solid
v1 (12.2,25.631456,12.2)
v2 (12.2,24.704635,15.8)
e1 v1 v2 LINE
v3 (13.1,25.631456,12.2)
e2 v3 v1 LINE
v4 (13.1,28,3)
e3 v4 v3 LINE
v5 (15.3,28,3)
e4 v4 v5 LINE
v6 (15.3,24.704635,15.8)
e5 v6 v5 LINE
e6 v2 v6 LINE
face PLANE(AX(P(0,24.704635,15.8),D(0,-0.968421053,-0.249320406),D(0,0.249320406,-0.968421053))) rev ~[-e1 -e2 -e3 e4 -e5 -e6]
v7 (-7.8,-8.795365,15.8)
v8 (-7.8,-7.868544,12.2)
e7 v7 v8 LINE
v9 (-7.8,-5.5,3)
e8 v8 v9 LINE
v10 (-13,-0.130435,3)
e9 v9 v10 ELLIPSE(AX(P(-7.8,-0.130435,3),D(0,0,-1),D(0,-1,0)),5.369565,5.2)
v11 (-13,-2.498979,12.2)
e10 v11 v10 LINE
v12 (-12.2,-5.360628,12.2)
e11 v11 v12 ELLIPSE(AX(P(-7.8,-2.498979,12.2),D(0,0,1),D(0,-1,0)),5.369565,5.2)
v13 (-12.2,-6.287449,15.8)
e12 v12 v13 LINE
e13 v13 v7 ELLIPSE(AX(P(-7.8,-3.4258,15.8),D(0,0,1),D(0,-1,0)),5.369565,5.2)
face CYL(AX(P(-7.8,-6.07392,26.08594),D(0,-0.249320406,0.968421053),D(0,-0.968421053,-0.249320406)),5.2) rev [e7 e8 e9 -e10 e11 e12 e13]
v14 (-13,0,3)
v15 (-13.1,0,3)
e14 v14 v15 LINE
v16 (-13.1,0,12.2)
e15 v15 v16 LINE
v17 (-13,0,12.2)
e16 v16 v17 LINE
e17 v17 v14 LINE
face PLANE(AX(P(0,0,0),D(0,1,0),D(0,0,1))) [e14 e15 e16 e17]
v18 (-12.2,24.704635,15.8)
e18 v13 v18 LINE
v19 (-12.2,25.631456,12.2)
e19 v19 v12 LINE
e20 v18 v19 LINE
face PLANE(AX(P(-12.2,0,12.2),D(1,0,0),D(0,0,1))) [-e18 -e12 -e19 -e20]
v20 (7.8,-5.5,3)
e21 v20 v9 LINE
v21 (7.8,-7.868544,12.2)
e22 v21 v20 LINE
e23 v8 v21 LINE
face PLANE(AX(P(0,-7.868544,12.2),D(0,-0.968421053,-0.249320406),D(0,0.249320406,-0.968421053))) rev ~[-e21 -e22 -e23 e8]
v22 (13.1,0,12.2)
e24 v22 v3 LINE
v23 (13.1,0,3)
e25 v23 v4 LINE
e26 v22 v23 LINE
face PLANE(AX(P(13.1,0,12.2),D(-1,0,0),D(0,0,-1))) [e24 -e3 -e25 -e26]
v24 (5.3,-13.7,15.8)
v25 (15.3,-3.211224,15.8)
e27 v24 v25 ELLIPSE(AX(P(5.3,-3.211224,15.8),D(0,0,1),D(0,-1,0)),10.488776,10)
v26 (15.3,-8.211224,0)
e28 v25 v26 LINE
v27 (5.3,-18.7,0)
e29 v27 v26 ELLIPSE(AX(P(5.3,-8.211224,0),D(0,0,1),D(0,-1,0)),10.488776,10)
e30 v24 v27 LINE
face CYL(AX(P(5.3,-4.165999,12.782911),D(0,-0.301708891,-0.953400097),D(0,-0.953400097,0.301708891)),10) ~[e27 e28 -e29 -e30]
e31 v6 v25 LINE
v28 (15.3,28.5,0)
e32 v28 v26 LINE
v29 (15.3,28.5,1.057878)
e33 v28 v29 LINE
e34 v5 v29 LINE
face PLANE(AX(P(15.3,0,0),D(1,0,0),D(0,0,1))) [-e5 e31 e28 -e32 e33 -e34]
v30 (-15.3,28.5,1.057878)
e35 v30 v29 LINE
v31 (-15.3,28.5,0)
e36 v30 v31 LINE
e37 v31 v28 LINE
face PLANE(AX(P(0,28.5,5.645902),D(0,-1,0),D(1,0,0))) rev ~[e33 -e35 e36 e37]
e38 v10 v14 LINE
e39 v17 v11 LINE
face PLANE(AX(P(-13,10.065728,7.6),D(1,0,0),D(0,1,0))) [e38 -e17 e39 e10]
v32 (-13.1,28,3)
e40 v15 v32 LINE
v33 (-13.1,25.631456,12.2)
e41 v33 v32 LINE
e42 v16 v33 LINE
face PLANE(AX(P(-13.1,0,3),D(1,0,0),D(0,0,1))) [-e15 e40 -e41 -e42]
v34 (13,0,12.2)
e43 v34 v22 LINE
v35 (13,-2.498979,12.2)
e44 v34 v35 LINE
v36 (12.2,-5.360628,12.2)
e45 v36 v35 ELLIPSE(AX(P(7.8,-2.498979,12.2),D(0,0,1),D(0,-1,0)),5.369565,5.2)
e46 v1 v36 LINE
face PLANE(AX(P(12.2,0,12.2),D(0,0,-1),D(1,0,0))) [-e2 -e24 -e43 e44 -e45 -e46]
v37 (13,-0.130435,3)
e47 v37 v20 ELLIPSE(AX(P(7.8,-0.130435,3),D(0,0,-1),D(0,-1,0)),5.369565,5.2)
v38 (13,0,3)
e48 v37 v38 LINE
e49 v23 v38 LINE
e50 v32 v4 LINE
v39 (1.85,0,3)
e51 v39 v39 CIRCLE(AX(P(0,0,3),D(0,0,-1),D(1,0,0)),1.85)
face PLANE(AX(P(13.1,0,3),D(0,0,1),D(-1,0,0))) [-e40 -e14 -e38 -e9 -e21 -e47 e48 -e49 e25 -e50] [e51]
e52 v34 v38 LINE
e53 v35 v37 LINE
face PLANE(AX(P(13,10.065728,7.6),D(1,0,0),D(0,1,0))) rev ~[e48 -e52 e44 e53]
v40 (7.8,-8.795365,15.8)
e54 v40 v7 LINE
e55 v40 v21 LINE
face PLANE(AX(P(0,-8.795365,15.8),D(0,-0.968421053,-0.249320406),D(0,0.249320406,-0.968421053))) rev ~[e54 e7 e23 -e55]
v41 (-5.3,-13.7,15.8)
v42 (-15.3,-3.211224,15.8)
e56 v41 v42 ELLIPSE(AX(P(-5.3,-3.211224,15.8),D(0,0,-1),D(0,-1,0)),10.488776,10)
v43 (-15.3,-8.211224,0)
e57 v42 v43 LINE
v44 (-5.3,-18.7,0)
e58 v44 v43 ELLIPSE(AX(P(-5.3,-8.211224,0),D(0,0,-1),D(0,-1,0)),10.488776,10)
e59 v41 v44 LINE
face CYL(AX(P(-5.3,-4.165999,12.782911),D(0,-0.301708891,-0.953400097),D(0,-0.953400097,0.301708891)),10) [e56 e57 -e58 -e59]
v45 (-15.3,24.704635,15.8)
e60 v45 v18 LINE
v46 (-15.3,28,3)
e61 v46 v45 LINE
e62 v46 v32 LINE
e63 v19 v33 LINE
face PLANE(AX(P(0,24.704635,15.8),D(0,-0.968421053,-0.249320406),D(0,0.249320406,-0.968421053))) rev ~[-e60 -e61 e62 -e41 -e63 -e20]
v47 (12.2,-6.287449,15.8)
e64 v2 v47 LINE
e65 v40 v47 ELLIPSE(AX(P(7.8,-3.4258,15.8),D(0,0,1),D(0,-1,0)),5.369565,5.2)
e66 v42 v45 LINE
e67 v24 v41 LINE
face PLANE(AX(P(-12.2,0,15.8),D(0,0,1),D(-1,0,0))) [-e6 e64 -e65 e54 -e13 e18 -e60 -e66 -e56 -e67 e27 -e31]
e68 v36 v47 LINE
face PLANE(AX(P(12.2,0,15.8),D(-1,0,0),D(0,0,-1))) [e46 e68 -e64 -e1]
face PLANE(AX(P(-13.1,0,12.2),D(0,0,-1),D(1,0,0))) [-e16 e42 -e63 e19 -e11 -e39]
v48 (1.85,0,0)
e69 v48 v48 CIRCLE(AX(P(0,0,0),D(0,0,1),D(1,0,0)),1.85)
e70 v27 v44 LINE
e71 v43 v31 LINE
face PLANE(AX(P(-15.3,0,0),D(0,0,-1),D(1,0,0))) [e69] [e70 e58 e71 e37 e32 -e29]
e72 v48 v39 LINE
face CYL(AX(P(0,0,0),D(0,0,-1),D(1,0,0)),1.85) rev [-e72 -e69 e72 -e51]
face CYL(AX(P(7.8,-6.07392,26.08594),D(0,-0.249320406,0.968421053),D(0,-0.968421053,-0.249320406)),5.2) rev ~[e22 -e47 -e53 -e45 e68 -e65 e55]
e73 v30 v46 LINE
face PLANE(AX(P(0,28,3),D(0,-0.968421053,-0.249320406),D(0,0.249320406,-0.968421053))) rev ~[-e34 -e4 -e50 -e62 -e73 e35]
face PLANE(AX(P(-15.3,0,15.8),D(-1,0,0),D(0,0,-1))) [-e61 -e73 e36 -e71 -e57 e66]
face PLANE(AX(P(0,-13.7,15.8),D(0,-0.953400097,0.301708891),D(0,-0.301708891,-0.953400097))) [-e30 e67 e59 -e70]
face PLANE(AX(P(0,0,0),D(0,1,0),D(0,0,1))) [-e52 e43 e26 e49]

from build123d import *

# Parameters (mm, degrees)
F3_DEPTH    = 13
F4_DEPTH    = 12.2
F5_T1_DEPTH = 35.5
F6_DEPTH    = 15.3
F7_R        = 10
F8_DEPTH    = 28.5
F10_R       = 1.85
F11_DEPTH   = 5
F14_DEPTH   = 20


# Not quite as in the source:
# - a fillet or chamfer that OpenCascade refuses, or shapes differently, is made with other operations: its cross-section is extruded or revolved along the edge and cut away or added


with BuildPart() as f3:
    # F2 (on Right) → F3 (new body, symmetric)
    with BuildSketch(Plane.YZ):
        Polygon((-5.5, 3), (0, 3), (28, 3), (25.6314561435, 12.2), (-7.8685438565, 12.2), align=None)
    extrude(amount=F3_DEPTH, both=True)

    # F2 (on Right) → F4 (join, symmetric)
    with BuildSketch(Plane.YZ):
        Polygon((-8.7953653655, 15.8), (-7.8685438565, 12.2), (25.6314561435, 12.2), (24.7046346345, 15.8), align=None)
    extrude(amount=F4_DEPTH, both=True)

    # F5: fillet of radius 5.2 on 2 edges, made by hand

    # F5_s2 → F5_t1 (cut)
    with BuildSketch(Plane(origin=(0, -6.6759341801, 25.9309509046), x_dir=(1, 0, 0), z_dir=(0, 0.2493204059, -0.9684210526))):
        with BuildLine():
            ThreePointArc((7.8, 4.5783545716), (11.4769552622, 3.0553098338), (13, -0.6216454284))
            Line((13, -0.6216454284), (13, 4.5783545716))
            Line((13, 4.5783545716), (7.8, 4.5783545716))
        make_face()
        with BuildLine():
            ThreePointArc((-7.8, 4.5783545716), (-11.4769552622, 3.0553098338), (-13, -0.6216454284))
            Line((-13, -0.6216454284), (-13, 4.5783545716))
            Line((-13, 4.5783545716), (-7.8, 4.5783545716))
        make_face()
    extrude(amount=F5_T1_DEPTH, mode=Mode.SUBTRACT)


with BuildPart() as f6:
    # F1 (on Right) → F6 (new body, symmetric)
    with BuildSketch(Plane.YZ):
        Polygon((-18.7, 0), (0, 0), (0, 15.8), (-13.7, 15.8), align=None)
    extrude(amount=F6_DEPTH, both=True)

    # F7
    f7_edges = [f6.edges().sort_by_distance(p)[0] for p in [
        (15.3, -16.2, 7.9),
        (-15.3, -16.2, 7.9),
    ]]
    fillet(f7_edges, radius=F7_R)

    # F0 (on Front) → F8 (join)
    with BuildSketch(Plane.XZ):
        Polygon((-15.3, 0), (0, 0), (15.3, 0), (15.3, 15.8), (12.2, 15.8), (12.2, 12.2), (13.1, 12.2), (13.1, 3), (0, 3), (-13.1, 3), (-13.1, 12.2), (-12.2, 12.2), (-12.2, 15.8), (-15.3, 15.8), align=None)
    extrude(amount=-F8_DEPTH)

    # F9: cut F3
    add(f3.part, mode=Mode.SUBTRACT)


with BuildPart() as f11:
    # F10 (on Top) → F11 (new body)
    with BuildSketch(Plane.XY):
        Circle(F10_R)
    extrude(amount=F11_DEPTH)


with BuildPart() as f6_1:
    add(f6.part)

    # F12: cut F11
    add(f11.part, mode=Mode.SUBTRACT)

    # F13 (on Right) → F14 (cut, symmetric)
    with BuildSketch(Plane.YZ):
        Polygon((29.3071324871, 15.8), (24.7046346345, 15.8), (28, 3), (29.3071324871, -2.0772202713), align=None)
    extrude(amount=F14_DEPTH, both=True, mode=Mode.SUBTRACT)


solid = f6_1.part
